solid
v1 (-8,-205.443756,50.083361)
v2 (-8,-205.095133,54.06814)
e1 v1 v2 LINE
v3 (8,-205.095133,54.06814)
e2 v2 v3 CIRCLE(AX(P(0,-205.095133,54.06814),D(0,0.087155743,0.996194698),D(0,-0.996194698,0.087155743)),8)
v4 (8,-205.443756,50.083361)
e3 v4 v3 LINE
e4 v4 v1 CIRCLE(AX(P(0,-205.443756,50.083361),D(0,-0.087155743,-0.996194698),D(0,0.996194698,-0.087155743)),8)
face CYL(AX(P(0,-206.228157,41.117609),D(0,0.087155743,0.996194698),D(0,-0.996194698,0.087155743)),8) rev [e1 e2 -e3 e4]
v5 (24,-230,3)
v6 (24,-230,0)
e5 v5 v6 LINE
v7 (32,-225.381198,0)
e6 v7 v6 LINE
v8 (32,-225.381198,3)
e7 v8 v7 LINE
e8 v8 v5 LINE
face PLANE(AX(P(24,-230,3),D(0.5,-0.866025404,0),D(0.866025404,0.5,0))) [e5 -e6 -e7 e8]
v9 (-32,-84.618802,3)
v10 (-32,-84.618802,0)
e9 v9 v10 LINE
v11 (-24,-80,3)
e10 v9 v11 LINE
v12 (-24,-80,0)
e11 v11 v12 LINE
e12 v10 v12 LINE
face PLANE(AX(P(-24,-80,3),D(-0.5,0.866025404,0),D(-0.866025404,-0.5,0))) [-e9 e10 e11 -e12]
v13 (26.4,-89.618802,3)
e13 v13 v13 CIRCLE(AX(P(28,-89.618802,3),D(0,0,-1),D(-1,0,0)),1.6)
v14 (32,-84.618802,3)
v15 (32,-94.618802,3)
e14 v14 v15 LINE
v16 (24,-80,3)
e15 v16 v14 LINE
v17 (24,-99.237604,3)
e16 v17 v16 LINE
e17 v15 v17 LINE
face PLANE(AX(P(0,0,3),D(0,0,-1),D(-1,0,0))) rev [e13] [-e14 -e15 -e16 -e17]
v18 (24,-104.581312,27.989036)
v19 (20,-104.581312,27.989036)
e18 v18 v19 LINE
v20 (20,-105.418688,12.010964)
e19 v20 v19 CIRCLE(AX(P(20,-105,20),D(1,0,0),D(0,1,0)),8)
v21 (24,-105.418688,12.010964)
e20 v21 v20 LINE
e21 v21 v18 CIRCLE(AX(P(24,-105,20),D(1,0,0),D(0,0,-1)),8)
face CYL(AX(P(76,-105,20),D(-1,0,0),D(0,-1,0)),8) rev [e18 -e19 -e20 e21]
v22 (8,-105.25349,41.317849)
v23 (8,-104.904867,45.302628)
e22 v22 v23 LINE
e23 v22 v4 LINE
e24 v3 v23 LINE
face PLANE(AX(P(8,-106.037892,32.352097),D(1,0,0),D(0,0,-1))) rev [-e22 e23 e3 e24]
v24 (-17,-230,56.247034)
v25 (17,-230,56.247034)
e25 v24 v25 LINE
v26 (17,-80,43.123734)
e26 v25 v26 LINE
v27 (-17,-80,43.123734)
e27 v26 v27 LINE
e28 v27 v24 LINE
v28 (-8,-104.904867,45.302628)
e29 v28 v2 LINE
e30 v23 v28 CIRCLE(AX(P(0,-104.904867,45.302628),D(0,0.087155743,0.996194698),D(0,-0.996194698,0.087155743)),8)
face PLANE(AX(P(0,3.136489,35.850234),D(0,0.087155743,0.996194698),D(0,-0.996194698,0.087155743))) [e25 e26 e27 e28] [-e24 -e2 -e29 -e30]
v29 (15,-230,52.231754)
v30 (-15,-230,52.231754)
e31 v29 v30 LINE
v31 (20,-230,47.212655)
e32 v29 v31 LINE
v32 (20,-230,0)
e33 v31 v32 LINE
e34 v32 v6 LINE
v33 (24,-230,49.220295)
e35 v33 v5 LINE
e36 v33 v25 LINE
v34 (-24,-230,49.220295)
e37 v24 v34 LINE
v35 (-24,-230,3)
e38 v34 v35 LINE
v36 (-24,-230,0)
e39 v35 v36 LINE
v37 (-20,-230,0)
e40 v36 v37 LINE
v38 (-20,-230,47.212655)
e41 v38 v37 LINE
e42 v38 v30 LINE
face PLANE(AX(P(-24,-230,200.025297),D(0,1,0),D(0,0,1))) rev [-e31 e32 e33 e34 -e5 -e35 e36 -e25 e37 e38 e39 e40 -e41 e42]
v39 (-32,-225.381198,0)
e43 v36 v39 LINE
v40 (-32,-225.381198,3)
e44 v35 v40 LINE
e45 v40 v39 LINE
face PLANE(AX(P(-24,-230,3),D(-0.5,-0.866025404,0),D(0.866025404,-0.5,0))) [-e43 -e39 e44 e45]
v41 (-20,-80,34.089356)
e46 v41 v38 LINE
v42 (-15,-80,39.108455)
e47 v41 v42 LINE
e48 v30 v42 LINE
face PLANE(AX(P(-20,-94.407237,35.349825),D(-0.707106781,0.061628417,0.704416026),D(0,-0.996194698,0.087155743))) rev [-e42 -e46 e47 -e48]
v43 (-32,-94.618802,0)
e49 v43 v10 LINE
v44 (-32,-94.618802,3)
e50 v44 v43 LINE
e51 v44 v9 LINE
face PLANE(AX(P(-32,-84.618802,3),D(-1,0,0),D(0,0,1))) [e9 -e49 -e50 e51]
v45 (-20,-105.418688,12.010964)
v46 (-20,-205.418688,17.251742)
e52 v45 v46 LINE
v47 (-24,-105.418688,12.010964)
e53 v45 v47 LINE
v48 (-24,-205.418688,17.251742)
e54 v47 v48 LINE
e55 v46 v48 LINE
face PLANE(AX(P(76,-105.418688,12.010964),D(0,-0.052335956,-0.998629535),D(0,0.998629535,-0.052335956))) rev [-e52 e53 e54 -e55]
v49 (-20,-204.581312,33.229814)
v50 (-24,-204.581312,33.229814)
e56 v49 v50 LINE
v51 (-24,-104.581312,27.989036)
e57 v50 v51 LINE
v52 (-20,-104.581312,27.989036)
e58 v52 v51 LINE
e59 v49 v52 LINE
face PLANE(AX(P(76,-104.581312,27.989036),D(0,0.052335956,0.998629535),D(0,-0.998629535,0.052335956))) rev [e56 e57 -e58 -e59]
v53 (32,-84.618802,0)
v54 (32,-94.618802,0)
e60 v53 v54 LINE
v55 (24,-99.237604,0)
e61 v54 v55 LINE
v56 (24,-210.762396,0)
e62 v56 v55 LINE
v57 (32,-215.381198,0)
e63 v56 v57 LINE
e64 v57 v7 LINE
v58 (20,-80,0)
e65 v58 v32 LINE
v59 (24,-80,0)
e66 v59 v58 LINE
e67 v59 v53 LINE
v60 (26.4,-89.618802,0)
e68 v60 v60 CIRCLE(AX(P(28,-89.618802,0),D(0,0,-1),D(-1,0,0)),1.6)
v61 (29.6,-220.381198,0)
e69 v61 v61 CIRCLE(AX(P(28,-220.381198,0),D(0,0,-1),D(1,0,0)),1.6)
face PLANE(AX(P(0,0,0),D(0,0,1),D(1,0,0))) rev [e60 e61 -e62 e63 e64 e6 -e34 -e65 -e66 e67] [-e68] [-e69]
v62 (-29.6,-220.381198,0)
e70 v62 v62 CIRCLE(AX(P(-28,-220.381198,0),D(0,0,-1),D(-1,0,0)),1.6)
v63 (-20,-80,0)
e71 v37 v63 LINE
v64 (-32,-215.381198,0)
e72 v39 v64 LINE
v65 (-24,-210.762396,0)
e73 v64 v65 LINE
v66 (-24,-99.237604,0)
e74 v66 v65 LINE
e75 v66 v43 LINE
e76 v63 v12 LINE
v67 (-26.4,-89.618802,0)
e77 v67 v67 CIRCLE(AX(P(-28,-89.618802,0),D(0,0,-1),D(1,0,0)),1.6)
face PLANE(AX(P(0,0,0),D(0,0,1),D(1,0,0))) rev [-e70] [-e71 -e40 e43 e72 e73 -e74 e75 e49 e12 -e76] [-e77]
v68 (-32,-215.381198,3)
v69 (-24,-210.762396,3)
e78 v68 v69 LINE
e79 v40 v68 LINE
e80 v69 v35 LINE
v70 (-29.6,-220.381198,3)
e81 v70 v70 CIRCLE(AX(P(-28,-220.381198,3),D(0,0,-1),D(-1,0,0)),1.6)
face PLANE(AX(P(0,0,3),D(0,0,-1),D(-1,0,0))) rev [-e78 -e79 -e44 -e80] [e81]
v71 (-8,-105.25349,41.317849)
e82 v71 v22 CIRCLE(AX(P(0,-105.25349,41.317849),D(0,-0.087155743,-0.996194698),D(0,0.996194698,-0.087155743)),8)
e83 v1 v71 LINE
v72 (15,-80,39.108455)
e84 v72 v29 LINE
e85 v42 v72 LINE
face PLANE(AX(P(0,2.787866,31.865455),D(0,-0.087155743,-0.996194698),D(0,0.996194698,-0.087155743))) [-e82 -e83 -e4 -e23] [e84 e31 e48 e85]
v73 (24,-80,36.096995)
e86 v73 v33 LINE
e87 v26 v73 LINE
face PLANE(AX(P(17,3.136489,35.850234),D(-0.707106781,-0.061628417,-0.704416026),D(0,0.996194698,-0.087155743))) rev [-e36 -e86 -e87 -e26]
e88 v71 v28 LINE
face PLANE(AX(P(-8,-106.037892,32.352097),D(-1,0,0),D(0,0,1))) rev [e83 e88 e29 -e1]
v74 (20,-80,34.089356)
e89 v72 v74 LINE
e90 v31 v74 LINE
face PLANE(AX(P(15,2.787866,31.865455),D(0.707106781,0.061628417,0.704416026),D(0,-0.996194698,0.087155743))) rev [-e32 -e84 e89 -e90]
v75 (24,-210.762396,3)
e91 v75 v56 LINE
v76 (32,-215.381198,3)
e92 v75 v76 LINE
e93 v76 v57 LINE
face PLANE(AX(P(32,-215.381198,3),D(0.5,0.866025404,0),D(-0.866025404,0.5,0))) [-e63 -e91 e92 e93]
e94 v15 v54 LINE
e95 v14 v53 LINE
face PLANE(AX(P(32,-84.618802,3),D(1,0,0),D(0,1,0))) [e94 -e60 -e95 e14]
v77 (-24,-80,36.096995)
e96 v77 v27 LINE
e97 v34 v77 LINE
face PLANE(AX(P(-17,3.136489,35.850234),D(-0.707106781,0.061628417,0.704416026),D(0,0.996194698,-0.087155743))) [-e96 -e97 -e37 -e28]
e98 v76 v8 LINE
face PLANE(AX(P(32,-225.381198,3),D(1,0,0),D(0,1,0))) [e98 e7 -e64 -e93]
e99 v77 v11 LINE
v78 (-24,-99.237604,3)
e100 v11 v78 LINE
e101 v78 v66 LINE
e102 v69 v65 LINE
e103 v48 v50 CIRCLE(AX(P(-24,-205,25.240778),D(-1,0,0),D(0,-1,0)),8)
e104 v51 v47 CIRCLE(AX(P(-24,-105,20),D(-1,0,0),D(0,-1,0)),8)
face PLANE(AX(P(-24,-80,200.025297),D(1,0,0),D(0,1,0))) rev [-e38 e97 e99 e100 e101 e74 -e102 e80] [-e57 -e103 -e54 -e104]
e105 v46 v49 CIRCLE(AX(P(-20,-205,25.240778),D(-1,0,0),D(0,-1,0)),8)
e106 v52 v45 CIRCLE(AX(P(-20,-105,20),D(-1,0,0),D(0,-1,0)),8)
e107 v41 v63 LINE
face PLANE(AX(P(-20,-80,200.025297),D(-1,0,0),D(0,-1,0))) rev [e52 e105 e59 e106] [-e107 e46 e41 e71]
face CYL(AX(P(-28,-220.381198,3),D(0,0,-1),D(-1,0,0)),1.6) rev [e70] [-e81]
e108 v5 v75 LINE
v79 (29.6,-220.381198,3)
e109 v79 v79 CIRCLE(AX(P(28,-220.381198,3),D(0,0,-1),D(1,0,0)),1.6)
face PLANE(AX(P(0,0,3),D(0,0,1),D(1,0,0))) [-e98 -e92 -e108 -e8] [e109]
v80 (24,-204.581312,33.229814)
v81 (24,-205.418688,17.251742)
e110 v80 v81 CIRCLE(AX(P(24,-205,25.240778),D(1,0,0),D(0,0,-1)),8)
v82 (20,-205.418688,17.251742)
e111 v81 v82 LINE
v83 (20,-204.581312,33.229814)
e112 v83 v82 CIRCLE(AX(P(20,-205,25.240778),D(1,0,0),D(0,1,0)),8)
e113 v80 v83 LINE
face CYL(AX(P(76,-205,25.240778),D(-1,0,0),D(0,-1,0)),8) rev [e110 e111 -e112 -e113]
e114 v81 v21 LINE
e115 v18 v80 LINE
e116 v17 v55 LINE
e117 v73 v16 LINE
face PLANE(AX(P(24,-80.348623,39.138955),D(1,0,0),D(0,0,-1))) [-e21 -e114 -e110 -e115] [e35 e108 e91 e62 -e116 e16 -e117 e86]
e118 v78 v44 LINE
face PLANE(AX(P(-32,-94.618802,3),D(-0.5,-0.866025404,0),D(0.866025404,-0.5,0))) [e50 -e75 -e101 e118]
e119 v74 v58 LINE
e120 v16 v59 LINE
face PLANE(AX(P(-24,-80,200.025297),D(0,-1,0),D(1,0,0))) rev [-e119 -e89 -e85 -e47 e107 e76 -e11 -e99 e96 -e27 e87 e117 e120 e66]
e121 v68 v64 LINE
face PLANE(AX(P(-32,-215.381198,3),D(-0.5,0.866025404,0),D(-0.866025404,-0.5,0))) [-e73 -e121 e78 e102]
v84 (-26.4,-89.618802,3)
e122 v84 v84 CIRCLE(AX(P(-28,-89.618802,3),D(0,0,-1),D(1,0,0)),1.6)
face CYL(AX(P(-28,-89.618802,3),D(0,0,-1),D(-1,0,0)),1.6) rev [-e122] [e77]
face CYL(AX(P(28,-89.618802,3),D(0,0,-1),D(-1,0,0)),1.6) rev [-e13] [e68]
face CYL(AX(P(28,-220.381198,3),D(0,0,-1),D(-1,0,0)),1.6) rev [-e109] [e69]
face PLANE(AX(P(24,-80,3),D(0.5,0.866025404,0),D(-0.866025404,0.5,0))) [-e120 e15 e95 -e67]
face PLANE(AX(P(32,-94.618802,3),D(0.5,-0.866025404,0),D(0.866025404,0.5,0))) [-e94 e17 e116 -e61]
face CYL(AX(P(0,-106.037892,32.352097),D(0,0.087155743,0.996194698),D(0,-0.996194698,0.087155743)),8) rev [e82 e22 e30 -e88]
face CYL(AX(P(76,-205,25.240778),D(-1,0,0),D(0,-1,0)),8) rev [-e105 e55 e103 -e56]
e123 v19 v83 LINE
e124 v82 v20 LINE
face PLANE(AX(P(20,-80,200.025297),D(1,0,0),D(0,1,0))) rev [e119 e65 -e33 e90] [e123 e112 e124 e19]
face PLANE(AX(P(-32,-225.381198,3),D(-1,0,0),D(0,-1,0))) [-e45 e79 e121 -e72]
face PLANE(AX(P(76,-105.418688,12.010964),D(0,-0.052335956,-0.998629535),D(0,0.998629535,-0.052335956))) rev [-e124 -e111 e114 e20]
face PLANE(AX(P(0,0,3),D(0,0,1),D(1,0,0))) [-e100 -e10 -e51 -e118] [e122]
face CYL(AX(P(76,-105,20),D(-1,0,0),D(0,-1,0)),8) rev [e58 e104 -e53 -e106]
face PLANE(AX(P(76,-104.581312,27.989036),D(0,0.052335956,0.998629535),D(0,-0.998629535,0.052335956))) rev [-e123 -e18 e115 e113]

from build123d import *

# Parameters (mm, degrees)
BOSS_EXTRUDE1_START   = -24
BOSS_EXTRUDE1_DEPTH   = 4
BOSS_EXTRUDE1_START_2 = 20
BOSS_EXTRUDE1_2_DEPTH = 4
SKETCH3_W             = 48
SKETCH3_H             = 150.572975632
BOSS_EXTRUDE2_DEPTH   = 4
SKETCH4_W             = 87.955919885
SKETCH4_H             = 41.238898543
CUT_EXTRUDE1_DEPTH    = 10
CHAMFER1_SIZE         = 5
CHAMFER2_SIZE         = 7
CUT_EXTRUDE2_DEPTH    = 100
BOSS_EXTRUDE3_REACH   = 158.663
SKETCH7_R             = 1.6
BOSS_EXTRUDE4_DEPTH   = 3
CUT_EXTRUDE3_DEPTH    = 13


# Read off the part's stored shape, not the designer's step: Boss-Extrude1
with BuildPart() as part:
    # Boss-Extrude1 outline → Boss-Extrude1 (new body)
    with BuildSketch(Plane.YZ.offset(BOSS_EXTRUDE1_START)):
        Polygon((-230, 56.247033646), (-230, 0), (-80, 0), (-80, 43.123734117), align=None)
    extrude(amount=BOSS_EXTRUDE1_DEPTH)



with BuildPart() as body_2:
    # Boss-Extrude1 2 outline → Boss-Extrude1 2 (new body)
    with BuildSketch(Plane.YZ.offset(BOSS_EXTRUDE1_START_2)):
        Polygon((-230, 56.247033646), (-230, 0), (-80, 0), (-80, 43.123734117), align=None)
    extrude(amount=BOSS_EXTRUDE1_2_DEPTH)


with BuildPart() as part_1:
    add(part.part)

    add(body_2.part)  # Boss-Extrude2 merges body 2
    # Sketch3 → Boss-Extrude2 (add)
    with BuildSketch(Plane(origin=(0, 3.136489042, 35.850233801), x_dir=(1, 0, 0), z_dir=(-5.546132053355945e-15, 0.08715574274765837, 0.9961946980917457))):
        with Locations((0, -158.74054474)):
            Rectangle(SKETCH3_W, SKETCH3_H)
    extrude(amount=-BOSS_EXTRUDE2_DEPTH)

    # Sketch4 → Cut-Extrude1 (cut)
    with BuildSketch(Plane.XZ.offset(230)):
        with Locations((0.013546112, 51.627258861)):
            Rectangle(SKETCH4_W, SKETCH4_H)
    extrude(amount=CUT_EXTRUDE1_DEPTH, mode=Mode.SUBTRACT)

    # Chamfer1
    chamfer1_edges = [part_1.edges().sort_by_distance(p)[0] for p in [
        (-20, -155.174311485, 45.685354811),
        (20, -155.174311485, 45.685354811),
    ]]
    chamfer(chamfer1_edges, length=CHAMFER1_SIZE)

    # Chamfer2
    # the kernel refuses this chamfer: 7 mm, written as the material it takes off along each edge
    with BuildSketch(Plane(origin=(24, -62.066721296, 41.55477553), x_dir=(0.027495876610592048, -0.08712279063597585, -0.9958180537232768), z_dir=(0, -0.9961946980916814, 0.0871557427483924)), Plane(origin=(-24, -62.066721296, 41.55477553), x_dir=(0.9996219169112968, 0.0023964235485137053, 0.027391246498848068), z_dir=(0, -0.9961946980916814, 0.0871557427483924))) as chamfer2_piece_1:
        Polygon((CHAMFER2_SIZE * 0.999621916911, -CHAMFER2_SIZE * 0.0274958766106), (-CHAMFER2_SIZE * 0.0274958766106, -CHAMFER2_SIZE * 0.999621916911), (0, 0), align=None)
    extrude(amount=186.576537463, mode=Mode.SUBTRACT)

    # Sketch5 → Cut-Extrude2 (cut)
    with BuildSketch(Plane.ZY.offset(24)):
        with BuildLine():
            Line((27.989036278, -104.58131235), (33.229814206, -204.58131235))
            ThreePointArc((33.229814206, -204.58131235), (25.659465578, -212.989036278), (17.25174165, -205.41868765))
            Line((17.25174165, -205.41868765), (12.010963722, -105.41868765))
            ThreePointArc((12.010963722, -105.41868765), (19.58131235, -97.010963722), (27.989036278, -104.58131235))
        make_face()
    extrude(amount=-CUT_EXTRUDE2_DEPTH, mode=Mode.SUBTRACT)

    # Boss-Extrude3: up to this face of the body (flat: up to its plane)
    boss_extrude3_end = Plane(part_1.part.faces().sort_by_distance((21.96487497, -80, 19.069947066))[0])
    # Sketch6 → Boss-Extrude3 (add, up to the picked face)
    with BuildSketch(Plane(origin=(0, -83.136489042, 7.273500317), x_dir=(1, 0, 0), z_dir=(0, 0.9961946980917457, -0.0871557427476584)), mode=Mode.PRIVATE) as boss_extrude3_sk1:
        Polygon((20, -32.98717587), (20, -26.98717587), (15, -31.98717587), (-15, -31.98717587), (-20, -26.98717587), (-20, -32.98717587), (-17, -35.98717587), (17, -35.98717587), align=None)
    boss_extrude3_tool1 = split(extrude(boss_extrude3_sk1.sketch, amount=BOSS_EXTRUDE3_REACH, mode=Mode.PRIVATE), bisect_by=boss_extrude3_end, keep=Keep.BOTH, mode=Mode.PRIVATE)
    add(boss_extrude3_tool1.solids().sort_by(Axis((0, -80.224162, 40.561552), (0, 0.9961946980917457, -0.0871557427476584)))[0])

    # Sketch7 → Boss-Extrude4 (add)
    # profile 1 of 4: a face of its own
    with BuildSketch(Plane(origin=(0, 0, 0), x_dir=(-1, 0, 0), z_dir=(0, 0, -1))):
        Polygon((-24, -80), (-32, -84.618802154), (-32, -94.618802154), (-24, -99.237604307), align=None)
        with Locations((-28, -89.618802154)):
            Circle(SKETCH7_R, mode=Mode.SUBTRACT)
    # profile 2 of 4: a face of its own
    with BuildSketch(Plane(origin=(0, 0, 0), x_dir=(-1, 0, 0), z_dir=(0, 0, -1))):
        Polygon((-24, -210.762395693), (-24, -230), (-32, -225.381197846), (-32, -215.381197846), align=None)
        with Locations(Location((-28, -220.381197846, 0), (0, 0, 180))):
            Circle(SKETCH7_R, mode=Mode.SUBTRACT)
    # profile 3 of 4: a face of its own
    with BuildSketch(Plane(origin=(0, 0, 0), x_dir=(-1, 0, 0), z_dir=(0, 0, -1))):
        Polygon((24, -230), (32, -225.381197846), (32, -215.381197846), (24, -210.762395693), align=None)
        with Locations((28, -220.381197846)):
            Circle(SKETCH7_R, mode=Mode.SUBTRACT)
    # profile 4 of 4: a face of its own
    with BuildSketch(Plane(origin=(0, 0, 0), x_dir=(-1, 0, 0), z_dir=(0, 0, -1))):
        Polygon((24, -99.237604307), (24, -80), (32, -84.618802154), (32, -94.618802154), align=None)
        with Locations(Location((28, -89.618802154, 0), (0, 0, 180))):
            Circle(SKETCH7_R, mode=Mode.SUBTRACT)
    extrude(amount=-BOSS_EXTRUDE4_DEPTH)

    # Sketch8 → Cut-Extrude3 (cut)
    with BuildSketch(Plane(origin=(0, 3.136489042, 35.850233801), x_dir=(1, 0, 0), z_dir=(-5.546132053355945e-15, 0.08715574274765837, 0.9961946980917457))):
        with BuildLine():
            Line((8, -108.454056924), (8, -209.027032556))
            ThreePointArc((8, -209.027032556), (0, -217.027032556), (-8, -209.027032556))
            Line((-8, -209.027032556), (-8, -108.454056924))
            ThreePointArc((-8, -108.454056924), (0, -100.454056924), (8, -108.454056924))
        make_face()
    extrude(amount=-CUT_EXTRUDE3_DEPTH, mode=Mode.SUBTRACT)


solid = part_1.part
